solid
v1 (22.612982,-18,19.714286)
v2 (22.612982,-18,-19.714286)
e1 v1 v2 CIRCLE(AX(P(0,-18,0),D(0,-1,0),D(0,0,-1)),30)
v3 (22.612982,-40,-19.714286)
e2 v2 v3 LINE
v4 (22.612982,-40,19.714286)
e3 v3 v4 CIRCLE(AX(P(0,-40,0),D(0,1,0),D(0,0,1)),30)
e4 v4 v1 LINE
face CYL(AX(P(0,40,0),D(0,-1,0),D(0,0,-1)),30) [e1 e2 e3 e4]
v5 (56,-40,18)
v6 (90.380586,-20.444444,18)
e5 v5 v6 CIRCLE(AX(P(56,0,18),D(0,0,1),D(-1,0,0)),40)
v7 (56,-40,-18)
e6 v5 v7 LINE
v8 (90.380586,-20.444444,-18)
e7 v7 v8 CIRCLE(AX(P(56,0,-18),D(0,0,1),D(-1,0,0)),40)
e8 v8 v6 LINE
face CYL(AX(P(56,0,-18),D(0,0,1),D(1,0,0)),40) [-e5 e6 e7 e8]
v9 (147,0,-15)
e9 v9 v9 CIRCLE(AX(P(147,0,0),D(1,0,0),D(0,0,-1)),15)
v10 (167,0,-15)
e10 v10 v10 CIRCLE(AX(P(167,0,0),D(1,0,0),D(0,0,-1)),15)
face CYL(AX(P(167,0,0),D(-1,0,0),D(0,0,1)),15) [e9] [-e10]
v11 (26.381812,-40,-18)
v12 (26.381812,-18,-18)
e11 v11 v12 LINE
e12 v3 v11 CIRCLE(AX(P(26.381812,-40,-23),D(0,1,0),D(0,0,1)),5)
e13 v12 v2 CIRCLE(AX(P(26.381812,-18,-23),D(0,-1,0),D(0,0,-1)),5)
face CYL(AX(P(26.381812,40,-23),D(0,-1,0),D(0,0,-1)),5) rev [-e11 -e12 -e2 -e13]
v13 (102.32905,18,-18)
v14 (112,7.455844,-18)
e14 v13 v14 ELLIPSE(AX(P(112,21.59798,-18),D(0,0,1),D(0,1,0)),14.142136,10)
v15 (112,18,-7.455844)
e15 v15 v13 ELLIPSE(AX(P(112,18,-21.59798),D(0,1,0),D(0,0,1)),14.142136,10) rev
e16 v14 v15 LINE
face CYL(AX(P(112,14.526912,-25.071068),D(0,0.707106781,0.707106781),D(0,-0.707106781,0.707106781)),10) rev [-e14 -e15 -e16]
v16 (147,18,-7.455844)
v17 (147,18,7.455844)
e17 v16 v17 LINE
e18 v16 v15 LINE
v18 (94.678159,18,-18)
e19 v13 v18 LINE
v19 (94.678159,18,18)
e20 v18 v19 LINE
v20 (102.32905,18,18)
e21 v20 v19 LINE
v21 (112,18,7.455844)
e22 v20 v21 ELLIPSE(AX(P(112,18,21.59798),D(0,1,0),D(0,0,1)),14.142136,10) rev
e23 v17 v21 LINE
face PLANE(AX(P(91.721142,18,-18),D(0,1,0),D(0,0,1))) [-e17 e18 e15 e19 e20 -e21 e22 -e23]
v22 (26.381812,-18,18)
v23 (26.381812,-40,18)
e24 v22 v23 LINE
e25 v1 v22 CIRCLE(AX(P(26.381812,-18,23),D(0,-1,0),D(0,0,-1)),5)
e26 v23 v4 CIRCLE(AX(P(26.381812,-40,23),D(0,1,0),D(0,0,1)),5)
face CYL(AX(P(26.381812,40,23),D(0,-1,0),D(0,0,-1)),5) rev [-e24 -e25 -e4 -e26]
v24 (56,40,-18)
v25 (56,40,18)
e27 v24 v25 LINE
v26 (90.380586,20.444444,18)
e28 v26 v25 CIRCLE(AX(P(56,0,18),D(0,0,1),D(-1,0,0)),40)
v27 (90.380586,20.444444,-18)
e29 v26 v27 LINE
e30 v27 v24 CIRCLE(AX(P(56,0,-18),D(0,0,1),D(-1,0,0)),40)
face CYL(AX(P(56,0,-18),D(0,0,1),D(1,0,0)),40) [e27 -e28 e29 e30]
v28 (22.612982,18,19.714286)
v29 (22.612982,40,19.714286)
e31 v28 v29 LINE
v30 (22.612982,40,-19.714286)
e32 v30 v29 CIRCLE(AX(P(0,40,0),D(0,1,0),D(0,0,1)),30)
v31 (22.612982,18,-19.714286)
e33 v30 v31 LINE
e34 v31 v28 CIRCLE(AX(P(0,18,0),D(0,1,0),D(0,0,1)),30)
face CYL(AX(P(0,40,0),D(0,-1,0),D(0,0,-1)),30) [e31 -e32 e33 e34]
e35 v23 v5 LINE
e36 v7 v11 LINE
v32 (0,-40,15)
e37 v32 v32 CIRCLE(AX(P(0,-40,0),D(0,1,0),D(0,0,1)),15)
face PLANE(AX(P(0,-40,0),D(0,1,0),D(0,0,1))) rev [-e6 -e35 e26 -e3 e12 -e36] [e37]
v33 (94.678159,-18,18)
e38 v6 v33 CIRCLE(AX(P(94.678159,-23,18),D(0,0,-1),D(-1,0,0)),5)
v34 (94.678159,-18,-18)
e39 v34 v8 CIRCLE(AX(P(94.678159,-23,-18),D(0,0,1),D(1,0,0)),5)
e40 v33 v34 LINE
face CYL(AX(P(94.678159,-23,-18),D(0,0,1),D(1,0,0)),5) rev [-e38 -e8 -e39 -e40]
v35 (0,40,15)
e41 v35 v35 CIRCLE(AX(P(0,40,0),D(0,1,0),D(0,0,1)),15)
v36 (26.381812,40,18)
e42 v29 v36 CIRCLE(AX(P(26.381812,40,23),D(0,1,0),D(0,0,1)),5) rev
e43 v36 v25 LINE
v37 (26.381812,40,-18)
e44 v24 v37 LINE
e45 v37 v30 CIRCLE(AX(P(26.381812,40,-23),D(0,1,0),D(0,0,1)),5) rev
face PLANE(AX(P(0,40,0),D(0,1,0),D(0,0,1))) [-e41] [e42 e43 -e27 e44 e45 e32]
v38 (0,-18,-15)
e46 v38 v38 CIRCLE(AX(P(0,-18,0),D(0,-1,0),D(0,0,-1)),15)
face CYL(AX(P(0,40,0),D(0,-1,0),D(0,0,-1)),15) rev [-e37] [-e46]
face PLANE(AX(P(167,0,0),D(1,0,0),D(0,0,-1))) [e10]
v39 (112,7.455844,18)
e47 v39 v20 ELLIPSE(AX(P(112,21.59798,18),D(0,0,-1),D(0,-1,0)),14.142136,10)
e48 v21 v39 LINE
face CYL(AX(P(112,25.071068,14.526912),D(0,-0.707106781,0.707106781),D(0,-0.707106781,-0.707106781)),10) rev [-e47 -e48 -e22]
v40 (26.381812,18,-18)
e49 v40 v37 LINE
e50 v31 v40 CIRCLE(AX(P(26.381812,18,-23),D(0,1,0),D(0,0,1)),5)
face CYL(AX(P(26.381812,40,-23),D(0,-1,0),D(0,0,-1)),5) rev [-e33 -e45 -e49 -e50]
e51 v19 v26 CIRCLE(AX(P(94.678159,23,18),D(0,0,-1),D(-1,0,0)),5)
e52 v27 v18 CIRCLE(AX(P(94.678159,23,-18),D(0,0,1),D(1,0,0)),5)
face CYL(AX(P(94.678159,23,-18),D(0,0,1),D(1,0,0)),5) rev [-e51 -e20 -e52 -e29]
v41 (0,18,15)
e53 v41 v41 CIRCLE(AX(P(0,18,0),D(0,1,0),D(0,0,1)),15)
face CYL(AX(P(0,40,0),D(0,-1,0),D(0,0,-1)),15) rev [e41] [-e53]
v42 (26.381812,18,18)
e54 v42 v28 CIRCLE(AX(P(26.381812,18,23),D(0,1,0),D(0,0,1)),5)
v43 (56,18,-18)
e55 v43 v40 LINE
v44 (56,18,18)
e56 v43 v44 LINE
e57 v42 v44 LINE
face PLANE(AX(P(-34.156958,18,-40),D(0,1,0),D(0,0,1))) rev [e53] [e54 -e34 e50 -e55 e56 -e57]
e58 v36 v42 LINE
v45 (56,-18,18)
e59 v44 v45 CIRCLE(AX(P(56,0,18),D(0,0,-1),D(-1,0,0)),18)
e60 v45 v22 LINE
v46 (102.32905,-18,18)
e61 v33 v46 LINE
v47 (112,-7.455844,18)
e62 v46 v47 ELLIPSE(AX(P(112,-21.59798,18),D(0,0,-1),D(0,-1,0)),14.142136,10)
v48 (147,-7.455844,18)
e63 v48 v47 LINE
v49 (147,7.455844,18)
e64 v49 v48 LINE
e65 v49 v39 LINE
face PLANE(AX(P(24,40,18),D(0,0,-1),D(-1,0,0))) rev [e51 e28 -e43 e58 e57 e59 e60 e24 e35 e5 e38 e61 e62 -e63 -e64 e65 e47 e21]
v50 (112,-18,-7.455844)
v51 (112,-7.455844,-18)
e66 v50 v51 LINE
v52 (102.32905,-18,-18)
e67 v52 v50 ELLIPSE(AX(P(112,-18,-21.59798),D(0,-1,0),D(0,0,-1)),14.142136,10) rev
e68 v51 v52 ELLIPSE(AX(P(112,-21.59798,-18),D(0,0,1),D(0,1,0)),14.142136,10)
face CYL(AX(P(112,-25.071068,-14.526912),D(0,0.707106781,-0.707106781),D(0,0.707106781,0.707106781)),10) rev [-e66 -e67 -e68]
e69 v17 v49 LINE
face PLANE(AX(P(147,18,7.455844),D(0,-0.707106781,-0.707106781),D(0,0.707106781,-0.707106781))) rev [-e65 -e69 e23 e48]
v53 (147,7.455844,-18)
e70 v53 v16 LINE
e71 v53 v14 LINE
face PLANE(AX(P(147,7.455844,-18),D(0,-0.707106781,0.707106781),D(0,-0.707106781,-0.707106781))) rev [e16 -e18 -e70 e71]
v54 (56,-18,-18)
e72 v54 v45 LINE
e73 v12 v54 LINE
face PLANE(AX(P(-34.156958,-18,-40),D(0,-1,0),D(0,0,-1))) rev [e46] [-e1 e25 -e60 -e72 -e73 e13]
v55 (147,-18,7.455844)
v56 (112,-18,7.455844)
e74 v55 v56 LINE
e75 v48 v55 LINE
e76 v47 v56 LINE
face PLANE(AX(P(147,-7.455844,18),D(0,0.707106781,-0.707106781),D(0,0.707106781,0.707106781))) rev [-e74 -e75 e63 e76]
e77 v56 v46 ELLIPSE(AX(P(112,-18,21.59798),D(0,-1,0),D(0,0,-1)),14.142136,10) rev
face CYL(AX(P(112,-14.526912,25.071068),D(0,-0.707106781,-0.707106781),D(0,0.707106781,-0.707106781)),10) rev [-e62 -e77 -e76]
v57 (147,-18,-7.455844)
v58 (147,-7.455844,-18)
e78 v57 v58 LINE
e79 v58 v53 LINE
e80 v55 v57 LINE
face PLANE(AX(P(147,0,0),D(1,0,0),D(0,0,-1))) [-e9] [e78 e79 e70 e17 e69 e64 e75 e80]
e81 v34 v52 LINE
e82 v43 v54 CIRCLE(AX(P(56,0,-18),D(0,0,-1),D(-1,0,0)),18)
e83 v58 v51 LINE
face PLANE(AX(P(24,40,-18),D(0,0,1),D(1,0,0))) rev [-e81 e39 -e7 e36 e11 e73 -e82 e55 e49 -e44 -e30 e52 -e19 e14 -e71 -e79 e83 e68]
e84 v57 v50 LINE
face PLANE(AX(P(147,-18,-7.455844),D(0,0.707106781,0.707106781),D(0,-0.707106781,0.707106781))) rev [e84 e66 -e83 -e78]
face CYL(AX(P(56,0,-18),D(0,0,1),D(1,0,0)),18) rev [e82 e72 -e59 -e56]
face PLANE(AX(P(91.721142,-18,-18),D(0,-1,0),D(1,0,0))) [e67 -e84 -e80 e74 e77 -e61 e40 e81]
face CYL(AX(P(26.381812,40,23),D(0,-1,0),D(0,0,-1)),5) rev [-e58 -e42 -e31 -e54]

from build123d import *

# Parameters (mm, degrees)
CROQUIS2_R              = 15
SALIENTE_EXTRUIR1_DEPTH = 40
CROQUIS3_W              = 99.474281043
CROQUIS3_H              = 36
CORTAR_EXTRUIR1_DEPTH   = 40
SALIENTE_EXTRUIR2_DEPTH = 36
SALIENTE_EXTRUIR3_DEPTH = 45
CROQUIS8_R              = 15
SALIENTE_EXTRUIR4_DEPTH = 20
REDONDEO1_R             = 10
REDONDEO2_R             = 5
REDONDEO3_R             = 5


with BuildPart() as part:
    # Croquis2 → Saliente-Extruir1 (new, symmetric)
    with BuildSketch(Plane(origin=(0, 0, 0), x_dir=(1, 0, 0), z_dir=(0, 1, 0))):
        with BuildLine():
            Line((24, -18), (56, -18))
            Line((56, -18), (56, 18))
            Line((56, 18), (24, 18))
            ThreePointArc((24, 18), (-30, 0), (24, -18))
        make_face()
        with Locations(Location((0, 0, 0), (0, 0, 270))):
            Circle(CROQUIS2_R, mode=Mode.SUBTRACT)
    extrude(amount=SALIENTE_EXTRUIR1_DEPTH, both=True)

    # Croquis3 → Cortar-Extruir1 (cut, symmetric)
    with BuildSketch(Plane.XY):
        with Locations((15.580182786, 0)):
            Rectangle(CROQUIS3_W, CROQUIS3_H)
    extrude(amount=CORTAR_EXTRUIR1_DEPTH, both=True, mode=Mode.SUBTRACT)


with BuildPart() as cortar_extruir1_piece_1:
    # of the separate pieces the step leaves, piece 1, a body of its own (cortar_extruir1_pieces)
    add(part.part.solids().sort_by_distance((24, -18, 18))[0])



with BuildPart() as cortar_extruir1_piece_2:
    # of the separate pieces the step leaves, piece 2, a body of its own (cortar_extruir1_pieces)
    add(part.part.solids().sort_by_distance((24, 40, 18))[0])


with BuildPart() as cortar_extruir1_piece_1_1:
    add(cortar_extruir1_piece_1.part)

    add(cortar_extruir1_piece_2.part)  # Saliente-Extruir2 merges Cortar-Extruir1 piece 2
    # Croquis5 → Saliente-Extruir2 (add)
    with BuildSketch(Plane.XY.offset(18)):
        with BuildLine():
            Line((91.721142199, 18), (102, 18))
            Line((102, 18), (102, -18))
            Line((102, -18), (91.721142199, -18))
            ThreePointArc((91.721142199, -18), (76.976176963, -34.058772732), (56, -40))
            Line((56, -40), (56, -18))
            ThreePointArc((56, -18), (74, 0), (56, 18))
            Line((56, 18), (56, 40))
            ThreePointArc((56, 40), (76.976176963, 34.058772732), (91.721142199, 18))
        make_face()
    extrude(amount=-SALIENTE_EXTRUIR2_DEPTH)

    # Croquis7 → Saliente-Extruir3 (add)
    with BuildSketch(Plane(origin=(102, 0, 0), x_dir=(0, 0, -1), z_dir=(1, 0, 0))):
        Polygon((-7.455844123, 18), (-18, 7.455844123), (-18, -7.455844123), (-7.455844123, -18), (7.455844123, -18), (18, -7.455844123), (18, 7.455844123), (7.455844123, 18), align=None)
    extrude(amount=SALIENTE_EXTRUIR3_DEPTH)

    # Croquis8 → Saliente-Extruir4 (add)
    with BuildSketch(Plane(origin=(147, 0, 0), x_dir=(0, 0, -1), z_dir=(1, 0, 0))):
        Circle(CROQUIS8_R)
    extrude(amount=SALIENTE_EXTRUIR4_DEPTH)

    # Redondeo1
    # the kernel refuses this fillet: 10 mm, written as the material it adds along each edge
    with BuildSketch(Plane(origin=(102, 35.67766953, -10.221825407), x_dir=(1, 0, 0), z_dir=(0, -0.7071067811865477, 0.7071067811865475))) as redondeo1_piece_1_section:
        with BuildLine():
            CenterArc((REDONDEO1_R, REDONDEO1_R), REDONDEO1_R, 180, 90)
            Line((0, REDONDEO1_R), (0, 0))
            Line((0, 0), (REDONDEO1_R, 0))
        make_face()
    redondeo1_piece_1 = extrude(amount=64.911688245, mode=Mode.PRIVATE)
    redondeo1_piece_1 = split(redondeo1_piece_1, bisect_by=Plane(origin=(104.775136412, 13.729156697, 18), z_dir=(0, 0, -1)), keep=Keep.TOP, mode=Mode.PRIVATE)
    redondeo1_piece_1 = split(redondeo1_piece_1, bisect_by=Plane(origin=(104.775136412, 18, 13.729156697), z_dir=(0, -1, 0)), keep=Keep.TOP, mode=Mode.PRIVATE)
    add(redondeo1_piece_1)
    with BuildSketch(Plane(origin=(102, -10.221825407, -35.67766953), x_dir=(1, 0, 0), z_dir=(0, 0.7071067811865475, 0.7071067811865476))) as redondeo1_piece_2_section:
        with BuildLine():
            CenterArc((REDONDEO1_R, REDONDEO1_R), REDONDEO1_R, 180, 90)
            Line((0, REDONDEO1_R), (0, 0))
            Line((0, 0), (REDONDEO1_R, 0))
        make_face()
    redondeo1_piece_2 = extrude(amount=64.911688245, mode=Mode.PRIVATE)
    redondeo1_piece_2 = split(redondeo1_piece_2, bisect_by=Plane(origin=(104.775136412, 18, -13.729156697), z_dir=(0, -1, 0)), keep=Keep.TOP, mode=Mode.PRIVATE)
    redondeo1_piece_2 = split(redondeo1_piece_2, bisect_by=Plane(origin=(104.775136412, 13.729156697, -18), z_dir=(0, 0, 1)), keep=Keep.TOP, mode=Mode.PRIVATE)
    add(redondeo1_piece_2)
    with BuildSketch(Plane(origin=(102, -35.67766953, 10.221825407), x_dir=(1, 0, 0), z_dir=(0, 0.7071067811865477, -0.7071067811865475))) as redondeo1_piece_3_section:
        with BuildLine():
            CenterArc((REDONDEO1_R, REDONDEO1_R), REDONDEO1_R, 180, 90)
            Line((0, REDONDEO1_R), (0, 0))
            Line((0, 0), (REDONDEO1_R, 0))
        make_face()
    redondeo1_piece_3 = extrude(amount=64.911688245, mode=Mode.PRIVATE)
    redondeo1_piece_3 = split(redondeo1_piece_3, bisect_by=Plane(origin=(104.775136412, -18, -13.729156697), z_dir=(0, 1, 0)), keep=Keep.TOP, mode=Mode.PRIVATE)
    redondeo1_piece_3 = split(redondeo1_piece_3, bisect_by=Plane(origin=(104.775136412, -13.729156697, -18), z_dir=(0, 0, 1)), keep=Keep.TOP, mode=Mode.PRIVATE)
    add(redondeo1_piece_3)
    with BuildSketch(Plane(origin=(102, 10.221825407, 35.67766953), x_dir=(0, -0.7071067811865476, 0.7071067811865476), z_dir=(0, -0.7071067811865476, -0.7071067811865476))) as redondeo1_piece_4_section:
        with BuildLine():
            CenterArc((REDONDEO1_R, -REDONDEO1_R), REDONDEO1_R, 90, 90)
            Line((0, -REDONDEO1_R), (0, 0))
            Line((0, 0), (REDONDEO1_R, 0))
        make_face()
    redondeo1_piece_4 = extrude(amount=64.911688245, mode=Mode.PRIVATE)
    redondeo1_piece_4 = split(redondeo1_piece_4, bisect_by=Plane(origin=(104.775136413, -13.729156697, 18), z_dir=(0, 0, -1)), keep=Keep.TOP, mode=Mode.PRIVATE)
    redondeo1_piece_4 = split(redondeo1_piece_4, bisect_by=Plane(origin=(104.775136413, -18, 13.729156697), z_dir=(0, 1, 0)), keep=Keep.TOP, mode=Mode.PRIVATE)
    add(redondeo1_piece_4)

    # Redondeo2
    redondeo2_edges = [cortar_extruir1_piece_1_1.edges().sort_by_distance(p)[0] for p in [
        (91.721142199, 18, 0),
        (91.721142199, -18, 0),
    ]]
    fillet(redondeo2_edges, radius=REDONDEO2_R)

    # Redondeo3
    redondeo3_edges = [cortar_extruir1_piece_1_1.edges().sort_by_distance(p)[0] for p in [
        (24, -29, 18),
        (24, -29, -18),
        (24, 29, -18),
        (24, 29, 18),
    ]]
    fillet(redondeo3_edges, radius=REDONDEO3_R)


solid = cortar_extruir1_piece_1_1.part
